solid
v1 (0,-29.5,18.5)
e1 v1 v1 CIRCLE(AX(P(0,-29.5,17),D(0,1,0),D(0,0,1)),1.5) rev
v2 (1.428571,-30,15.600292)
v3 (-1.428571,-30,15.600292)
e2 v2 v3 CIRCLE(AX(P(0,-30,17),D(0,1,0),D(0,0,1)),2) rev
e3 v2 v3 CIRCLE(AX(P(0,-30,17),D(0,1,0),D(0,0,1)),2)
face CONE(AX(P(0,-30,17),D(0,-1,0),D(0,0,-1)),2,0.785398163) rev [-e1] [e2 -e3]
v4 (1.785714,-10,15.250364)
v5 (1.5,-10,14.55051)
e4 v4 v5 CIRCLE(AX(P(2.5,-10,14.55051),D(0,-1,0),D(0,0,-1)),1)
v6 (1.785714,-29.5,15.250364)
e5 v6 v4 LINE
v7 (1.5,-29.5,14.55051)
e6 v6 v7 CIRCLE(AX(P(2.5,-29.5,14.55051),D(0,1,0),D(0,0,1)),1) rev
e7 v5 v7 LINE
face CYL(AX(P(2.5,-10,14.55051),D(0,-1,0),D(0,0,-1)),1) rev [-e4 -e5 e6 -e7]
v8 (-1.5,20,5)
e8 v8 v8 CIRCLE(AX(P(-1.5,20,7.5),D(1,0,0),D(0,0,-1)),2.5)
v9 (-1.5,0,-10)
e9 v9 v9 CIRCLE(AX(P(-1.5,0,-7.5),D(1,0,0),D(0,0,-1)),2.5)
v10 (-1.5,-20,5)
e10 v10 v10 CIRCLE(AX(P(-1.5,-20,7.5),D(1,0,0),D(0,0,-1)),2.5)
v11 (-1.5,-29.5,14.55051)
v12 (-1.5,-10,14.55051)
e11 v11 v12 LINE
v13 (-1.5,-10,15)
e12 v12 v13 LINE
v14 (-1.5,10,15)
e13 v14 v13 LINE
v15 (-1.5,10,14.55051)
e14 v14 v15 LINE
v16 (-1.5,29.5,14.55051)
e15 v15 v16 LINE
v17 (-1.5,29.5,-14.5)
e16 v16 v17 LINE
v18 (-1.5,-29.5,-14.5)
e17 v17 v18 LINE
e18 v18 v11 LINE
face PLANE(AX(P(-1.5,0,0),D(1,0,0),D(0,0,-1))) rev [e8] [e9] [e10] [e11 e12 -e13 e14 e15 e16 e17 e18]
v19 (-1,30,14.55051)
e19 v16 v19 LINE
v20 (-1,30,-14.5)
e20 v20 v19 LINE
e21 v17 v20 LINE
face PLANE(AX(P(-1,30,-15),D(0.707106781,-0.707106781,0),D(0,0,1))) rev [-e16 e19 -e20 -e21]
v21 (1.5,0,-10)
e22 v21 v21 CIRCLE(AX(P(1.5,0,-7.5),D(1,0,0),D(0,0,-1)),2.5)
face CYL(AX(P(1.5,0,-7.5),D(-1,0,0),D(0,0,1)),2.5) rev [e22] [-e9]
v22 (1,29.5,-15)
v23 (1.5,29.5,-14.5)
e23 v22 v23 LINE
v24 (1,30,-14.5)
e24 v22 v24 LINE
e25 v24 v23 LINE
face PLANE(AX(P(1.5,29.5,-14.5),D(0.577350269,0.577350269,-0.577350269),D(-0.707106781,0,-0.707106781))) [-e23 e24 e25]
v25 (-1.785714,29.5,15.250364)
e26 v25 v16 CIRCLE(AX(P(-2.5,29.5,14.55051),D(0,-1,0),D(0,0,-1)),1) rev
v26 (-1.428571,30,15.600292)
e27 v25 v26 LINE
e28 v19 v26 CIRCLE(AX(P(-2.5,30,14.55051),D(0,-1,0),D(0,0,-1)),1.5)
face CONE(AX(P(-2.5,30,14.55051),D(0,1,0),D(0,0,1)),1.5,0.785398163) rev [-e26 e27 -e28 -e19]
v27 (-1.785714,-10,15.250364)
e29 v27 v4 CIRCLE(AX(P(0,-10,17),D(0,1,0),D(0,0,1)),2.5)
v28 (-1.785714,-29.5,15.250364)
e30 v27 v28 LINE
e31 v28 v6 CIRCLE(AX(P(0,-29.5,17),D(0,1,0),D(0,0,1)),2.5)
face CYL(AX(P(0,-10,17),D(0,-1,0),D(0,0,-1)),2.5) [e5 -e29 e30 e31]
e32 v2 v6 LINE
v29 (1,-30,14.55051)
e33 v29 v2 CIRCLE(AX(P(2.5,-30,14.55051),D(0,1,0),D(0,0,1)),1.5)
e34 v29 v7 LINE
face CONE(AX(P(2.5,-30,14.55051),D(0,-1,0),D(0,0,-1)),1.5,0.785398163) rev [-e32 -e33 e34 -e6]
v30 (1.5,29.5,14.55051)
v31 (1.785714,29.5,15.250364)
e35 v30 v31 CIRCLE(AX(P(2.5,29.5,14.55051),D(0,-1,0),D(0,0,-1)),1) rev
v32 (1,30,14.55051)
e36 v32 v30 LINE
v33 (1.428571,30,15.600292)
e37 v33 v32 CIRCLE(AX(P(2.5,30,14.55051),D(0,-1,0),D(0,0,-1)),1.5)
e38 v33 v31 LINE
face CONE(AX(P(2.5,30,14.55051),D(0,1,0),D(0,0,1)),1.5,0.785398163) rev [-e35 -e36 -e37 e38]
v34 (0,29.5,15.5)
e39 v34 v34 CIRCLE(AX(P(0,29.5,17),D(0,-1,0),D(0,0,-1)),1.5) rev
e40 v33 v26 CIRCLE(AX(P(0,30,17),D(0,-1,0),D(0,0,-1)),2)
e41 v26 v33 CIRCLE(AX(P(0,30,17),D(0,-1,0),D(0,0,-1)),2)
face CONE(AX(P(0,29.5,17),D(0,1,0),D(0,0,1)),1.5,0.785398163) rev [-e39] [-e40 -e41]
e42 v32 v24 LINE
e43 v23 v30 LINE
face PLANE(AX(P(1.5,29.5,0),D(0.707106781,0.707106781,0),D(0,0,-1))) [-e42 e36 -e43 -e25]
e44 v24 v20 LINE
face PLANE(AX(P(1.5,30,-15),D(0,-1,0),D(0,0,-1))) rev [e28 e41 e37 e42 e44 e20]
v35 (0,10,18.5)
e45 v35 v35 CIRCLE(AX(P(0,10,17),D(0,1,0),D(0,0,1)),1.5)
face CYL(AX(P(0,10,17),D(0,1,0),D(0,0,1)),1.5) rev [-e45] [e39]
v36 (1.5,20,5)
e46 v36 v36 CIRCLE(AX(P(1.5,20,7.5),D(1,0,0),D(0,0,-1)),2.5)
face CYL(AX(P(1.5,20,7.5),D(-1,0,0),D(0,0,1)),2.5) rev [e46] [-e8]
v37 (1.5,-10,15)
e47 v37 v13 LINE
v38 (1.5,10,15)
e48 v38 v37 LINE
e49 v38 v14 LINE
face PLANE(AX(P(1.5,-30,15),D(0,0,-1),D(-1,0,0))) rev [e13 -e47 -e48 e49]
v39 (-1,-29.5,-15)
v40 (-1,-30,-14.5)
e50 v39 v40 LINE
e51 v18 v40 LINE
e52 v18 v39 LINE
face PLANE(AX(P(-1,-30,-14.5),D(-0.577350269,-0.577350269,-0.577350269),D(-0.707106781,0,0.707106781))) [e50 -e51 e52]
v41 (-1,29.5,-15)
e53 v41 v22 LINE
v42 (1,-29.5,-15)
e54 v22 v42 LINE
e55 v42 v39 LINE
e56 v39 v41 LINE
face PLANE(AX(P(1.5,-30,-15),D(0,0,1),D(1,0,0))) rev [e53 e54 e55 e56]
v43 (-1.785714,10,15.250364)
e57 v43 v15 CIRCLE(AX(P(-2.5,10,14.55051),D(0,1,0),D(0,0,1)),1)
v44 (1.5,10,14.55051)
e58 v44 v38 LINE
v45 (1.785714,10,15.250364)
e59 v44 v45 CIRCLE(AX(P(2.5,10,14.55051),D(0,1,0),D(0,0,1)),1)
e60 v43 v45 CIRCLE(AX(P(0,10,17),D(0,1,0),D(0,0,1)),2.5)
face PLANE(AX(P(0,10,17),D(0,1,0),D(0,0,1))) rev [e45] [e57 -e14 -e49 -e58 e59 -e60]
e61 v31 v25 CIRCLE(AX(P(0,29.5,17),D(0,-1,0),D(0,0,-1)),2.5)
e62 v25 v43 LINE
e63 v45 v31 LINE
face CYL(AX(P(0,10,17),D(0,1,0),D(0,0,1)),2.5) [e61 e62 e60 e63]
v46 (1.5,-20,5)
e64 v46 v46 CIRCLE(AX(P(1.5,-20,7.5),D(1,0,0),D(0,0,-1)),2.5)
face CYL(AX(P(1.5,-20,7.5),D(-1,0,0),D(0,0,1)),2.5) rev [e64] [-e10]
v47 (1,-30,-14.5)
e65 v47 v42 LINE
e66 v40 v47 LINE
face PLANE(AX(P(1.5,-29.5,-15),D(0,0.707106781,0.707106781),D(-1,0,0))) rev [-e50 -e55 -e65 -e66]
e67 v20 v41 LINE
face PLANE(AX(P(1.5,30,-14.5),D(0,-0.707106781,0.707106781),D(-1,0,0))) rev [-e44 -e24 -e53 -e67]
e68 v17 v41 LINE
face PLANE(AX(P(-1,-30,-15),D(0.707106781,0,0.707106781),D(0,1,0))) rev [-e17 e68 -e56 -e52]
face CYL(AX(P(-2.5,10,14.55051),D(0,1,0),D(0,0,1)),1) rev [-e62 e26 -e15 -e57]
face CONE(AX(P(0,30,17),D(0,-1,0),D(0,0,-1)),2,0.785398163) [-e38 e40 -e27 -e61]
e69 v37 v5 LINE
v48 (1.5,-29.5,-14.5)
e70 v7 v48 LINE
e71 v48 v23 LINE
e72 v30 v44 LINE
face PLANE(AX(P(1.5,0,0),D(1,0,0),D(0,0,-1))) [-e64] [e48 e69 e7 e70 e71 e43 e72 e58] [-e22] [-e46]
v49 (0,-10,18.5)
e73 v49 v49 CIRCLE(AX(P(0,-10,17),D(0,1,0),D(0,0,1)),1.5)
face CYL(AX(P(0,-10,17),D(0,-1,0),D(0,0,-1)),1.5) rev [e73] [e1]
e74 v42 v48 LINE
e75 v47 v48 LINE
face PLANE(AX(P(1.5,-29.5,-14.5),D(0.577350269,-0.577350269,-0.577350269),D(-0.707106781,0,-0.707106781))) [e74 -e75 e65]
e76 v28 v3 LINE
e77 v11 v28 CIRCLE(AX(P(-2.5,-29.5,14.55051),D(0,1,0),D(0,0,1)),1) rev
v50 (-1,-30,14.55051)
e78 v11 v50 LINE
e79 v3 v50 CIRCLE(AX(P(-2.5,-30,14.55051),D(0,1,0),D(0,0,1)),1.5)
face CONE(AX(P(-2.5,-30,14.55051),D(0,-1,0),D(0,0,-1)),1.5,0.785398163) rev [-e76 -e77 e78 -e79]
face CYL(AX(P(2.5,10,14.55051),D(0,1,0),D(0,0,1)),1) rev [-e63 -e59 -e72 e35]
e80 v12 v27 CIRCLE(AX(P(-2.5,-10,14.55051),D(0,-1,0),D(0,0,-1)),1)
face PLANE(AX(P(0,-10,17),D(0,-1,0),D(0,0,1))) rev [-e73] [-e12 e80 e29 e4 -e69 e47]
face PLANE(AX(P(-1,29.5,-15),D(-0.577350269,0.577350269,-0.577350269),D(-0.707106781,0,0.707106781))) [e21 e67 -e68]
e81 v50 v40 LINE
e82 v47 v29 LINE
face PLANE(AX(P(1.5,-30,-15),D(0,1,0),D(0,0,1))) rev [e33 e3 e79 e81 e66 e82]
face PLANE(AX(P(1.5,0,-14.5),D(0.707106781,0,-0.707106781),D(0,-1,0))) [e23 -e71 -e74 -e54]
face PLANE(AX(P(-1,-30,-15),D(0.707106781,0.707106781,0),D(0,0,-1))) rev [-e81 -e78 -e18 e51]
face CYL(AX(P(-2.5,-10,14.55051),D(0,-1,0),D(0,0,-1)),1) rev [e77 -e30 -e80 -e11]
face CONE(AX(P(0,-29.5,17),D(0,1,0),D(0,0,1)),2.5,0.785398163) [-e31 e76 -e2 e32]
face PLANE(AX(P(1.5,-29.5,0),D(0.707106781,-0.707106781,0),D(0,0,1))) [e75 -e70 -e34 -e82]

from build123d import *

# Parameters (mm, degrees)
SKETCH1_W           = 30
SKETCH1_H           = 60
SKETCH1_R           = 2.5
BOSS_EXTRUDE1_DEPTH = 1.5
SKETCH3_R           = 1.5
BOSS_EXTRUDE2_DEPTH = 20
FILLET1_R           = 1
CHAMFER1_SIZE       = 0.5


with BuildPart() as part:
    # Sketch1 → Boss-Extrude1 (new, symmetric)
    with BuildSketch(Plane(origin=(0, 0, 0), x_dir=(0, 0, -1), z_dir=(1, 0, 0))):
        Rectangle(SKETCH1_W, SKETCH1_H)
        with Locations((-7.5, 20)):
            Circle(SKETCH1_R, mode=Mode.SUBTRACT)
        with Locations((7.5, 0)):
            Circle(SKETCH1_R, mode=Mode.SUBTRACT)
        with Locations((-7.5, -20)):
            Circle(SKETCH1_R, mode=Mode.SUBTRACT)
    extrude(amount=BOSS_EXTRUDE1_DEPTH, both=True)

    # Sketch3 → Boss-Extrude2 (add)
    with BuildSketch(Plane(origin=(0, 30, 0), x_dir=(1, 0, 0), z_dir=(0, 1, 0))):
        with BuildLine():
            Line((-1.5, -15), (1.5, -15))
            ThreePointArc((1.5, -15), (0, -19.5), (-1.5, -15))
        make_face()
        with Locations(Location((0, -17, 0), (0, 0, 270))):
            Circle(SKETCH3_R, mode=Mode.SUBTRACT)
    boss_extrude2 = extrude(amount=-BOSS_EXTRUDE2_DEPTH)

    # Mirror1: Boss-Extrude2 across plane
    add(boss_extrude2.mirror(Plane.ZX))

    # Fillet1
    fillet1_edges = [part.edges().sort_by_distance(p)[0] for p in [
        (-1.5, -20, 15),
        (1.5, -20, 15),
        (1.5, 20, 15),
        (-1.5, 20, 15),
    ]]
    fillet(fillet1_edges, radius=FILLET1_R)

    # Chamfer1
    chamfer1_edges = [part.edges().sort_by_distance(p)[0] for p in [
        (1.5, 0, -15),
        (1.5, 30, -0.224744871),
        (0, 30, 15.5),
        (0, -30, 15.5),
        (-1.5, 30, -0.224744871),
        (0, -30, 19.5),
        (-1.5, 0, -15),
        (-1.5, -30, -0.224744871),
        (0, 30, 19.5),
        (1.5, -30, -0.224744871),
        (-1.5741799, -30, 14.92847473),
        (-1.5741799, 30, 14.92847473),
        (1.5741799, -30, 14.92847473),
        (1.5741799, 30, 14.92847473),
        (0, 30, -15),
        (0, -30, -15),
    ]]
    chamfer(chamfer1_edges, length=CHAMFER1_SIZE - 0.0001)  # a hair under: the kernel refuses the full size


solid = part.part
